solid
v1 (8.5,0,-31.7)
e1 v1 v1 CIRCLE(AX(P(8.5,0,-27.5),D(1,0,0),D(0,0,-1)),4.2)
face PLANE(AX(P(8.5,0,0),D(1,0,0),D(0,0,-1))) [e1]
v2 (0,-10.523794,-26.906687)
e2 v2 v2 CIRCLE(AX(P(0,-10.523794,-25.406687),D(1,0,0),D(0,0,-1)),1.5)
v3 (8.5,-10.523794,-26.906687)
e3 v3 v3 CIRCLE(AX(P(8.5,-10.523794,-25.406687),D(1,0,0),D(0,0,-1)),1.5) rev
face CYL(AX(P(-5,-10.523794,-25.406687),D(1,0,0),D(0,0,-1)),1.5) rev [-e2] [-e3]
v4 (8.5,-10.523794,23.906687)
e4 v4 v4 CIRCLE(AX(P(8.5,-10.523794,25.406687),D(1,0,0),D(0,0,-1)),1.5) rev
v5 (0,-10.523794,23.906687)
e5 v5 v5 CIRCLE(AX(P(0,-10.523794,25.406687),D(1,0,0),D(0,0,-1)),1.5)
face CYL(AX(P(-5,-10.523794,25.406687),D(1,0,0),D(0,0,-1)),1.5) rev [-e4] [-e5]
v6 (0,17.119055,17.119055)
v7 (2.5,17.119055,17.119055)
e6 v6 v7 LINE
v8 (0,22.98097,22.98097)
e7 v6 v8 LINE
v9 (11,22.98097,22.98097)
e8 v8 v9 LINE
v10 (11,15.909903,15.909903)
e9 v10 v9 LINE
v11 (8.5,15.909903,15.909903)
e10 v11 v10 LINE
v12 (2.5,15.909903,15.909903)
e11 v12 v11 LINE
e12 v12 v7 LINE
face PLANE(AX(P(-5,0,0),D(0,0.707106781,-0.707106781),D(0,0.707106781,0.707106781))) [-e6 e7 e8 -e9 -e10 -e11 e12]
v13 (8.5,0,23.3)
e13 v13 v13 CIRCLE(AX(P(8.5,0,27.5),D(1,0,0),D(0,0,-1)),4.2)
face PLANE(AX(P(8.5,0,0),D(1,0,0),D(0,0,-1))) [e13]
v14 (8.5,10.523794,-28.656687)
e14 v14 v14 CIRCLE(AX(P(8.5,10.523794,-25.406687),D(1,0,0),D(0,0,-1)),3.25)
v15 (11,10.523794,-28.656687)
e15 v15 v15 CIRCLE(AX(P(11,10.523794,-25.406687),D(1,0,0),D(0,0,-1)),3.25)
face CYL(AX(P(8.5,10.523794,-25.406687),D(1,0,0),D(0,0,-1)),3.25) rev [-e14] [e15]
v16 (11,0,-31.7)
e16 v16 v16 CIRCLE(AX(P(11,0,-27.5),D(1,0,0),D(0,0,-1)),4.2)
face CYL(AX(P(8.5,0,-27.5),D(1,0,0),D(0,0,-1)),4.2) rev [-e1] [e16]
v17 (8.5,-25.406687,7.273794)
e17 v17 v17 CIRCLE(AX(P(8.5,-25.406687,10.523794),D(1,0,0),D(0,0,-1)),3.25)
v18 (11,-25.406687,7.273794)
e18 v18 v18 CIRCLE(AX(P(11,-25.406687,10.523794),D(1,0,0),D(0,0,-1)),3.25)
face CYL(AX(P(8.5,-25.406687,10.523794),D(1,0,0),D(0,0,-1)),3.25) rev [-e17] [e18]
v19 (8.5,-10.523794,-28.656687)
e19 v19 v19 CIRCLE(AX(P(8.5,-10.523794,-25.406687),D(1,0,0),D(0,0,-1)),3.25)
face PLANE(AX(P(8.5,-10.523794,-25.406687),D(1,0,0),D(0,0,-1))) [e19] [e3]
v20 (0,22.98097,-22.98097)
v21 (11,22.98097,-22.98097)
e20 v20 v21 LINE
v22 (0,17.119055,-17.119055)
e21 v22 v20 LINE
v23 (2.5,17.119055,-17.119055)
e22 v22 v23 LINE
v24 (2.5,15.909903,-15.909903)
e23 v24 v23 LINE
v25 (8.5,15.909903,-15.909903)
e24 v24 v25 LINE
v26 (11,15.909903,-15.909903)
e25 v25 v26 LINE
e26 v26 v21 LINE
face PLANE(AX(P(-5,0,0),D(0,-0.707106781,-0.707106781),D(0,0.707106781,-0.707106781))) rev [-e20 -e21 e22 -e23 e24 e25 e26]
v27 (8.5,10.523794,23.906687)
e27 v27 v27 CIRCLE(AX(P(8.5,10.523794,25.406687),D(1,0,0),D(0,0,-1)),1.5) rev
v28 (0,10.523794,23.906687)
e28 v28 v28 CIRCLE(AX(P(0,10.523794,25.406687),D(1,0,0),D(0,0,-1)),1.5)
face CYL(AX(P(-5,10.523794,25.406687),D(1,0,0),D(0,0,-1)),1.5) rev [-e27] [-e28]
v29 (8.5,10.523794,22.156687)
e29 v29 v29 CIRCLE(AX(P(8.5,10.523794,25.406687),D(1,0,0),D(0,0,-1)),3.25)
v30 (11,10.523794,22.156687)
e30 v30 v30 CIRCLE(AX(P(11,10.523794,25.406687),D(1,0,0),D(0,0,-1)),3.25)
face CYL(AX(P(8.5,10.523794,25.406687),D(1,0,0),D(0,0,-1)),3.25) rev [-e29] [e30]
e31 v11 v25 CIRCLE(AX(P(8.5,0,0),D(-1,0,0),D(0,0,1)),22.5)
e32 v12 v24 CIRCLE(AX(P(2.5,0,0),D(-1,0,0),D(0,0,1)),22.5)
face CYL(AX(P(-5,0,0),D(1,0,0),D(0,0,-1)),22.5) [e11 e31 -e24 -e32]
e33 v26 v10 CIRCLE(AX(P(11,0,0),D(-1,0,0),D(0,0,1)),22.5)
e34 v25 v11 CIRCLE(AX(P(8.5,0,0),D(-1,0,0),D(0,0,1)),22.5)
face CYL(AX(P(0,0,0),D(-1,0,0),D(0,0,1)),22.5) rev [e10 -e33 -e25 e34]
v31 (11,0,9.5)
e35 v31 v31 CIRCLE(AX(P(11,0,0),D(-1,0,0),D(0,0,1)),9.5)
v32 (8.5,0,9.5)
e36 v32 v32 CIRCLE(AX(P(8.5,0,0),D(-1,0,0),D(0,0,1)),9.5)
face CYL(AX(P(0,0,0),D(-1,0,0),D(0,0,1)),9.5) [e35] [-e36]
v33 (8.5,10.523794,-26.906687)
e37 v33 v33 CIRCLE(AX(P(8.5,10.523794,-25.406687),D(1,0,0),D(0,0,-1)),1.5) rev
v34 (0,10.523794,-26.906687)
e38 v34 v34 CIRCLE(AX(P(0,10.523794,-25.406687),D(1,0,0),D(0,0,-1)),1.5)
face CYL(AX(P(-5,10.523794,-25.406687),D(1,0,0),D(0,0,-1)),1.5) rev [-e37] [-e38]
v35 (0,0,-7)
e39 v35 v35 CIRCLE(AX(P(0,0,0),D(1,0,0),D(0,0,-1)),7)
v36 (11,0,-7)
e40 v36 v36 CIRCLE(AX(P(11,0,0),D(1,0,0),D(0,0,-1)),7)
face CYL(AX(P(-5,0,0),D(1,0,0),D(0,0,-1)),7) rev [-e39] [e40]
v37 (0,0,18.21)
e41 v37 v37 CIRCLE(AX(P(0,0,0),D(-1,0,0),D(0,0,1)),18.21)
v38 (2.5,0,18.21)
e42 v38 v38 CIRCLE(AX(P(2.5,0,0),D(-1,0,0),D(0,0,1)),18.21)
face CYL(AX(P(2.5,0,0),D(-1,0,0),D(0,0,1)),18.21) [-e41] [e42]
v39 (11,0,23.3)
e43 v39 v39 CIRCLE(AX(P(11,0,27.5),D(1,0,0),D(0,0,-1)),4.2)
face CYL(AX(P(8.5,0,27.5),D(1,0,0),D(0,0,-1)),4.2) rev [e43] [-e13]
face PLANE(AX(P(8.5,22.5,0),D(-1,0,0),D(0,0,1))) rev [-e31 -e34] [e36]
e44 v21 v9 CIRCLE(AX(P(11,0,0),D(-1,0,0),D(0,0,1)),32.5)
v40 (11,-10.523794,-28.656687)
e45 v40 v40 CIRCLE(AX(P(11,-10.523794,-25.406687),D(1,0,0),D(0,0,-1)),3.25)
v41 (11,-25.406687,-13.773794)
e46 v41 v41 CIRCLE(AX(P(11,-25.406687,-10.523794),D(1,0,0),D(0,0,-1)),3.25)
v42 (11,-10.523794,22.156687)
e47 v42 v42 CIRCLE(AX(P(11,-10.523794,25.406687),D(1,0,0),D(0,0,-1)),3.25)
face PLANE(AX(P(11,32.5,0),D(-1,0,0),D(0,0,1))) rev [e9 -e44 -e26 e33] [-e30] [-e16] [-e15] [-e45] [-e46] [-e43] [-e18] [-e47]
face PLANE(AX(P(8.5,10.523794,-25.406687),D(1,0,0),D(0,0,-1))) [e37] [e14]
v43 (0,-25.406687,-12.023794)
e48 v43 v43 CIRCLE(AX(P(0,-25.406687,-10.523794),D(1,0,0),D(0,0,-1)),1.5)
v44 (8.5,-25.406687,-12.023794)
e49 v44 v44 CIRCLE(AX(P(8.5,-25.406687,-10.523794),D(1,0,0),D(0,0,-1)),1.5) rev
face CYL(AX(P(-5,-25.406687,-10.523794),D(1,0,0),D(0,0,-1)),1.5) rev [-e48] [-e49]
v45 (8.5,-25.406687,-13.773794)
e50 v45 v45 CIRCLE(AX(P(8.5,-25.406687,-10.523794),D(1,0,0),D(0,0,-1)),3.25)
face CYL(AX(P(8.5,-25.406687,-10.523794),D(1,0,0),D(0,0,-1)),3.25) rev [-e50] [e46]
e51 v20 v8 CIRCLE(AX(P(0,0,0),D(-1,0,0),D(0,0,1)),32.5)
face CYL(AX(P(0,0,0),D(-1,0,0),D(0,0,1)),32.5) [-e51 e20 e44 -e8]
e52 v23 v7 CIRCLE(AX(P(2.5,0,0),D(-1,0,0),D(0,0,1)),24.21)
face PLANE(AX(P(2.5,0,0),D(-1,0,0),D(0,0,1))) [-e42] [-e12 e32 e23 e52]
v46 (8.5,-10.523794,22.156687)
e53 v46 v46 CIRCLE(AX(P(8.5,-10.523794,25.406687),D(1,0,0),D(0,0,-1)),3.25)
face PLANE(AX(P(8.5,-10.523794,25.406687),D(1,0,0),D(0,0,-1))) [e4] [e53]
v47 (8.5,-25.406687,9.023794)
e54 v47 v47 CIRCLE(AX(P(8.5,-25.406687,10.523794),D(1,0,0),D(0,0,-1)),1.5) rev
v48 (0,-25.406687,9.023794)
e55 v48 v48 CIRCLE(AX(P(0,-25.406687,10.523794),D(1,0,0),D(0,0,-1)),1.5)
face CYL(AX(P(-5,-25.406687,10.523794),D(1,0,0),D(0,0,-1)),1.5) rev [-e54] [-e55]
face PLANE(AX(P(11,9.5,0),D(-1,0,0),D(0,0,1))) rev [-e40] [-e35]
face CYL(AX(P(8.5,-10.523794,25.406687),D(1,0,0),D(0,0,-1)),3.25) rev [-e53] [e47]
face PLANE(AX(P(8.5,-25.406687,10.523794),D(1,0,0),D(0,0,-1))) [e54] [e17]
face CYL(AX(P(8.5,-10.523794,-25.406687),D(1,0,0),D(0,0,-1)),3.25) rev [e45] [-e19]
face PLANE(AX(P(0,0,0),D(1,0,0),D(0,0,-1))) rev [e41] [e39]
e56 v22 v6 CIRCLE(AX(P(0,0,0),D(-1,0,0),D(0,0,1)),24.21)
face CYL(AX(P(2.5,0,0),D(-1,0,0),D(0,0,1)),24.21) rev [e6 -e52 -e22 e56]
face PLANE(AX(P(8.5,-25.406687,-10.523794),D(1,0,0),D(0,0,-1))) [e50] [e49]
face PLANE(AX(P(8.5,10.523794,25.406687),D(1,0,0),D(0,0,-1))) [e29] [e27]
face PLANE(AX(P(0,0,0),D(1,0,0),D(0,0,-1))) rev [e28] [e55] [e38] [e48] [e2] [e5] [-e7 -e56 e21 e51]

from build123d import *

# Parameters (mm, degrees)
REVOLUCI_N1_OUTLINE_R     = 32.5
REVOLUCI_N1_DEPTH         = 8.5
REVOLUCI_N1_START         = 8.5
REVOLUCI_N1_2_OUTLINE_R   = 32.5
REVOLUCI_N1_2_OUTLINE_R_2 = 22.5
REVOLUCI_N1_2_OUTLINE_R_3 = 9.5
REVOLUCI_N1_2_DEPTH       = 2.5
CROQUIS2_R                = 7
CROQUIS2_R_2              = 1.5
CORTAR_EXTRUIR1_DEPTH     = 16
CORTAR_EXTRUIR2_START     = -16
CORTAR_EXTRUIR2_DEPTH     = 16
CORTAR_EXTRUIR4_DEPTH     = 2.5
CROQUIS7_R                = 3.25
CORTAR_EXTRUIR6_DEPTH     = 2.5
CROQUIS9_R                = 24.21
CROQUIS9_R_2              = 18.21
CORTAR_EXTRUIR7_DEPTH     = 2.5


# Read off the part's stored shape, not the designer's step: Revolución1
with BuildPart() as part:
    # Revolución1 outline → Revolución1 (new body)
    with BuildSketch(Plane.YZ):
        Circle(REVOLUCI_N1_OUTLINE_R)
    extrude(amount=REVOLUCI_N1_DEPTH)

    # Revoluci_n1 2 outline → Revoluci_n1 2 (add)
    # profile 1 of 2: a face of its own
    with BuildSketch(Plane.YZ.offset(REVOLUCI_N1_START)):
        Circle(REVOLUCI_N1_2_OUTLINE_R)
        Circle(REVOLUCI_N1_2_OUTLINE_R_2, mode=Mode.SUBTRACT)
    # profile 2 of 2: a face of its own
    with BuildSketch(Plane.YZ.offset(REVOLUCI_N1_START)):
        Circle(REVOLUCI_N1_2_OUTLINE_R_3)
    extrude(amount=REVOLUCI_N1_2_DEPTH)

    # Croquis2 → Cortar-Extruir1 (cut)
    with BuildSketch(Plane(origin=(11, 0, 0), x_dir=(0, 0, -1), z_dir=(1, 0, 0))):
        Circle(CROQUIS2_R)
        with Locations((25.406687144, -10.52379439)):
            Circle(CROQUIS2_R_2)
        with Locations((10.52379439, -25.406687144)):
            Circle(CROQUIS2_R_2)
        with Locations((-10.52379439, -25.406687144)):
            Circle(CROQUIS2_R_2)
        with Locations((-25.406687144, -10.52379439)):
            Circle(CROQUIS2_R_2)
        with Locations((-25.406687144, 10.52379439)):
            Circle(CROQUIS2_R_2)
        with Locations((25.406687144, 10.52379439)):
            Circle(CROQUIS2_R_2)
    extrude(amount=-CORTAR_EXTRUIR1_DEPTH, mode=Mode.SUBTRACT)

    # Croquis3 → Cortar-Extruir2 (cut)
    with BuildSketch(Plane(origin=(11, 0, 0), x_dir=(0, 0, -1), z_dir=(1, 0, 0)).offset(CORTAR_EXTRUIR2_START)):
        with BuildLine():
            Line((-22.980970389, 22.980970389), (-15.909902577, 15.909902577))
            ThreePointArc((-15.909902577, 15.909902577), (0, 22.5), (15.909902577, 15.909902577))
            Line((15.909902577, 15.909902577), (22.980970389, 22.980970389))
            ThreePointArc((22.980970389, 22.980970389), (0, 32.5), (-22.980970389, 22.980970389))
        make_face()
    extrude(amount=CORTAR_EXTRUIR2_DEPTH, mode=Mode.SUBTRACT)

    # Croquis5 → Cortar-Extruir4 (cut)
    with BuildSketch(Plane(origin=(11, 0, 0), x_dir=(0, 0, -1), z_dir=(1, 0, 0))):
        with BuildLine():
            ThreePointArc((31.7, 0), (27.5, 4.2), (23.3, 0))
            Line((23.3, 0), (31.7, 0))
        make_face()
        with BuildLine():
            Line((31.7, 0), (23.3, 0))
            ThreePointArc((23.3, 0), (27.5, -4.2), (31.7, 0))
        make_face()
        with BuildLine():
            ThreePointArc((-31.7, 0), (-27.5, -4.2), (-23.3, 0))
            Line((-23.3, 0), (-31.7, 0))
        make_face()
        with BuildLine():
            Line((-31.7, 0), (-23.3, 0))
            ThreePointArc((-23.3, 0), (-27.5, 4.2), (-31.7, 0))
        make_face()
    extrude(amount=-CORTAR_EXTRUIR4_DEPTH, mode=Mode.SUBTRACT)

    # Croquis7 → Cortar-Extruir6 (cut)
    with BuildSketch(Plane(origin=(11, 0, 0), x_dir=(0, 0, -1), z_dir=(1, 0, 0))):
        with Locations((25.406687144, -10.52379439)):
            Circle(CROQUIS7_R)
        with Locations((10.52379439, -25.406687144)):
            Circle(CROQUIS7_R)
        with Locations((-10.52379439, -25.406687144)):
            Circle(CROQUIS7_R)
        with Locations((-25.406687144, -10.52379439)):
            Circle(CROQUIS7_R)
        with Locations((-25.406687144, 10.52379439)):
            Circle(CROQUIS7_R)
        with Locations((25.406687144, 10.52379439)):
            Circle(CROQUIS7_R)
    extrude(amount=-CORTAR_EXTRUIR6_DEPTH, mode=Mode.SUBTRACT)

    # Croquis9 → Cortar-Extruir7 (cut)
    with BuildSketch(Plane.ZY):
        Circle(CROQUIS9_R)
        Circle(CROQUIS9_R_2, mode=Mode.SUBTRACT)
    extrude(amount=-CORTAR_EXTRUIR7_DEPTH, mode=Mode.SUBTRACT)


solid = part.part
